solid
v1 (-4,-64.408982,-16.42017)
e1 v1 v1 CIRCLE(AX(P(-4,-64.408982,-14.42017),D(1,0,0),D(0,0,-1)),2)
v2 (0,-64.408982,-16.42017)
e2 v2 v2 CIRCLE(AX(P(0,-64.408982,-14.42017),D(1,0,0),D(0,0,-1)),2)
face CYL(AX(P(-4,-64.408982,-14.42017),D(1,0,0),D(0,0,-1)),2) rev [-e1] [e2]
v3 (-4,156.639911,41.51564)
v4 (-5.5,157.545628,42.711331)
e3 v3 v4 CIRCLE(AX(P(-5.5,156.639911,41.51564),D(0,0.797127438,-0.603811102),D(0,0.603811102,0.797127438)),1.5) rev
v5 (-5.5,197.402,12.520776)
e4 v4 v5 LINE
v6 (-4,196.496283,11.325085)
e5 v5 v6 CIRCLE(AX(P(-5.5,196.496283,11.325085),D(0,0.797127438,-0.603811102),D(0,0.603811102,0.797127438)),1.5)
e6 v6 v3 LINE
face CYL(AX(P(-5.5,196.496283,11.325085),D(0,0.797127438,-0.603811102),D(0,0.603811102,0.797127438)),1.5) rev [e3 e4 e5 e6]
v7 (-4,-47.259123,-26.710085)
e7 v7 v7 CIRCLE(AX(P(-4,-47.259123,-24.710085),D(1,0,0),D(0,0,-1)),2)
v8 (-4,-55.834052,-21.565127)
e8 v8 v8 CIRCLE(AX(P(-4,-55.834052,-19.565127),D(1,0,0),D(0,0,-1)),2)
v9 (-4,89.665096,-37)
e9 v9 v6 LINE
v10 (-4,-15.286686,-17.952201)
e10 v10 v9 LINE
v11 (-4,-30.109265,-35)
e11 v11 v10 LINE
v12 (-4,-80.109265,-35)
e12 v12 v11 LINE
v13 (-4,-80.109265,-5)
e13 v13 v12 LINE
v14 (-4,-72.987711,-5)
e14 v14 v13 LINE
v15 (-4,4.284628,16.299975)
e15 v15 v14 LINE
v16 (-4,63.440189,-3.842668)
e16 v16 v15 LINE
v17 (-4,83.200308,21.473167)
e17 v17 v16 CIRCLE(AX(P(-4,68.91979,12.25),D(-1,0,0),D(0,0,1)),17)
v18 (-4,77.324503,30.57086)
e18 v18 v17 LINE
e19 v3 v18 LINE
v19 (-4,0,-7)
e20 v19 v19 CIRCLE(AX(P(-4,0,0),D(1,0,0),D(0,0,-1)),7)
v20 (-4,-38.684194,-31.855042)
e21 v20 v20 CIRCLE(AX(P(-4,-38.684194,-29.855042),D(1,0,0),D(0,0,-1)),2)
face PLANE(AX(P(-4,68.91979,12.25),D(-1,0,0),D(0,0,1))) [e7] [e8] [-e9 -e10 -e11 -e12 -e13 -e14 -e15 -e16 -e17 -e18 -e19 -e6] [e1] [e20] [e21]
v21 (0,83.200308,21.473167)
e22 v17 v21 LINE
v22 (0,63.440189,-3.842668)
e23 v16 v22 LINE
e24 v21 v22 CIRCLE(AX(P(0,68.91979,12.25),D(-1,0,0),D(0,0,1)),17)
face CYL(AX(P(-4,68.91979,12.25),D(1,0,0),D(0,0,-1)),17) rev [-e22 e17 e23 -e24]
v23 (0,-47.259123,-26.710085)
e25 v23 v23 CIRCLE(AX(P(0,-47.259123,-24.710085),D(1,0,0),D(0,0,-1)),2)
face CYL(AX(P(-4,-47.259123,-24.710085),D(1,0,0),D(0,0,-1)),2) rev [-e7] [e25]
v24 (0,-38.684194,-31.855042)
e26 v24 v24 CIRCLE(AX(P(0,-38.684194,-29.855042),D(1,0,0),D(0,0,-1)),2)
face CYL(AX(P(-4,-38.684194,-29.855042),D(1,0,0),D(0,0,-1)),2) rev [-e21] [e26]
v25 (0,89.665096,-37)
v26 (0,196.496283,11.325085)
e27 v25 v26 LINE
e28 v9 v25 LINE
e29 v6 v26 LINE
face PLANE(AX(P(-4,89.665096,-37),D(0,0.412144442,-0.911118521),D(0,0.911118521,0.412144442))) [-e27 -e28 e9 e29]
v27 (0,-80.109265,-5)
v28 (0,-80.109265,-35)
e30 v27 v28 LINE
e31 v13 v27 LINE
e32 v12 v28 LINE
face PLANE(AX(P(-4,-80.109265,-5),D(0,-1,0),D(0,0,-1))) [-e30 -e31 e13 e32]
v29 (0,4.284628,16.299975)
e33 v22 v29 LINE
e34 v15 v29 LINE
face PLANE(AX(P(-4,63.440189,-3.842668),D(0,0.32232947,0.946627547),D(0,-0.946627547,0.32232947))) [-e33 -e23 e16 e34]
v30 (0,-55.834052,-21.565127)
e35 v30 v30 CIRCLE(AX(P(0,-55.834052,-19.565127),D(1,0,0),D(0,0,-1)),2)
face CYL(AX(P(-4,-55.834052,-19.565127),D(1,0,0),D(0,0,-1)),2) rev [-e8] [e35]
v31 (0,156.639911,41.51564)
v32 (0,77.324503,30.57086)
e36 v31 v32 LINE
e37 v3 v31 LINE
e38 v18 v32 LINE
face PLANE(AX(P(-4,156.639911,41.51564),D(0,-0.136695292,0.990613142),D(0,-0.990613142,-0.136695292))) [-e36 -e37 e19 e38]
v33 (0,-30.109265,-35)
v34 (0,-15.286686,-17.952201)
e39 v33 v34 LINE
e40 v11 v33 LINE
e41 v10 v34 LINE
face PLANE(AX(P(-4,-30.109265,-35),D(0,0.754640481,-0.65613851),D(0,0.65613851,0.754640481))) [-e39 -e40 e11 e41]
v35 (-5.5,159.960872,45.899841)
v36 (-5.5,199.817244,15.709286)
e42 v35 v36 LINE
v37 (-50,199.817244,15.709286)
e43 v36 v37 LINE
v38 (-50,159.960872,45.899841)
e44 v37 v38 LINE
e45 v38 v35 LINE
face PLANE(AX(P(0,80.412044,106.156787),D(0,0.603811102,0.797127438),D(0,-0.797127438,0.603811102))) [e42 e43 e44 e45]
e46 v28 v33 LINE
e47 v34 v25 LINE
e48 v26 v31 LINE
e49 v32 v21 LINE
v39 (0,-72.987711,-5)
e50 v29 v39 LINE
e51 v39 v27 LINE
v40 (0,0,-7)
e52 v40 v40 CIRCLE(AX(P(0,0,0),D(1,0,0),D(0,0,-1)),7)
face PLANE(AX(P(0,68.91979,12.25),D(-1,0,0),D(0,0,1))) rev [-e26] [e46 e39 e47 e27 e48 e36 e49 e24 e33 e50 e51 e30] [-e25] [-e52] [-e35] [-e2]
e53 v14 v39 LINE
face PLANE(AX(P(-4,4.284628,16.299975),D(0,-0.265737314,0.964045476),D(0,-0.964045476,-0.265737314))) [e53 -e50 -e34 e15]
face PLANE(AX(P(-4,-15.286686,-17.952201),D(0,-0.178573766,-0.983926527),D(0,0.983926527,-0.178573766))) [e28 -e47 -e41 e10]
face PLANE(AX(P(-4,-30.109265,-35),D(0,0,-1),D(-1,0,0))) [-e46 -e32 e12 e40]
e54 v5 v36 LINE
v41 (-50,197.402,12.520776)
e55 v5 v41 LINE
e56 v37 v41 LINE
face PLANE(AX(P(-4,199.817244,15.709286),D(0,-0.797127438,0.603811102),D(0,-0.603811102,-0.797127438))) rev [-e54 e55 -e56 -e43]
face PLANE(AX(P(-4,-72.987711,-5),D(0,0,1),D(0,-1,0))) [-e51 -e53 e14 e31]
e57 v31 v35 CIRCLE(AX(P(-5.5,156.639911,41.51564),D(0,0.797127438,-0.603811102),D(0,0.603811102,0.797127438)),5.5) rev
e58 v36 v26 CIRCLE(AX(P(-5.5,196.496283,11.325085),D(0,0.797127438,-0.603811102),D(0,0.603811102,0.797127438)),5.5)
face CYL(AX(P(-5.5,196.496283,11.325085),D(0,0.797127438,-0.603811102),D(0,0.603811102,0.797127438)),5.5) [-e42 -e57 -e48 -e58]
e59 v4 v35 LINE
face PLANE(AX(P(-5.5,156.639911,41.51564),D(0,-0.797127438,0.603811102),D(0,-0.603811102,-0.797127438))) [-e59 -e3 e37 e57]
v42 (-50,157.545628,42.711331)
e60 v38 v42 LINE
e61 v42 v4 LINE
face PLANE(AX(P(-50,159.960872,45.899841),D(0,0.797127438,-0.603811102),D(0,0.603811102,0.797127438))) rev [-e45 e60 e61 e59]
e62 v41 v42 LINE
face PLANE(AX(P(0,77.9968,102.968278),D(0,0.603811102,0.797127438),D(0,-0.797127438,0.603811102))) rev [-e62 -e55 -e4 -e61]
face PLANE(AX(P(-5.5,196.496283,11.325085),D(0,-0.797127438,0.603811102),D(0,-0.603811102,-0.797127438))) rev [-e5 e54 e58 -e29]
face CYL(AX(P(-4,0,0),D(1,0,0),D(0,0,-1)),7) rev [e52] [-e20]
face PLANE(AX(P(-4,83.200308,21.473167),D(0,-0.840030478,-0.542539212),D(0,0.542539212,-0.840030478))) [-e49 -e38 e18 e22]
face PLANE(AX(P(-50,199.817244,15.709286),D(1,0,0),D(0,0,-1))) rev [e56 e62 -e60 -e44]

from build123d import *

# Parameters (mm, degrees)
SKETCH_6_R             = 7
SKETCH_6_R_2           = 2
SM_BASE_FLANGE_2_DEPTH = 4
SM_EDGE_FLANGE_1_DEPTH = 50


# Sheet-metal steps are written as plain solids
with BuildPart() as part:
    # Эскиз6 → Базовая кромка2 (new body)
    with BuildSketch(Plane(origin=(0, 0, 0), x_dir=(0, 0, -1), z_dir=(1, 0, 0))):
        with BuildLine():
            Line((-41.515639953, 156.639911011), (-30.570860008, 77.324503301))
            Line((-30.570860008, 77.324503301), (-21.473166605, 83.200308456))
            ThreePointArc((-21.473166605, 83.200308456), (-1.78992877, 82.320794398), (3.842668301, 63.440189352))
            Line((3.842668301, 63.440189352), (-16.29997452, 4.284628471))
            Line((-16.29997452, 4.284628471), (5, -72.987711453))
            Line((5, -72.987711453), (5, -80.109264525))
            Line((5, -80.109264525), (35, -80.109264525))
            Line((35, -80.109264525), (35, -30.109264525))
            Line((35, -30.109264525), (17.952200663, -15.286686185))
            Line((17.952200663, -15.286686185), (37, 89.665096307))
            Line((37, 89.665096307), (-11.325084854, 196.496282933))
            Line((-11.325084854, 196.496282933), (-41.515639953, 156.639911011))
        make_face()
        Circle(SKETCH_6_R, mode=Mode.SUBTRACT)
        with Locations((29.855042446, -38.684193782)):
            Circle(SKETCH_6_R_2, mode=Mode.SUBTRACT)
        with Locations((24.710084891, -47.259123039)):
            Circle(SKETCH_6_R_2, mode=Mode.SUBTRACT)
        with Locations((19.565127337, -55.834052297)):
            Circle(SKETCH_6_R_2, mode=Mode.SUBTRACT)
        with Locations((14.420169783, -64.408981554)):
            Circle(SKETCH_6_R_2, mode=Mode.SUBTRACT)
    extrude(amount=-SM_BASE_FLANGE_2_DEPTH)

    # Ребро-кромка1 section (across the edge) → Ребро-кромка1 (add)
    with BuildSketch(Plane(origin=(-4, 157.545627664, 42.711331111), x_dir=(-3.4914813388431334e-15, -0.6038111019965894, -0.7971274384348241), z_dir=(0, 0.7971274384348241, -0.6038111019965894))):
        with BuildLine():
            Line((-4, 1.5), (-4, 46))
            Line((-4, 46), (0, 46))
            Line((0, 46), (0, 1.5))
            ThreePointArc((0, 1.5), (0.439339828, 0.439339828), (1.5, 0))
            Line((1.5, 0), (1.5, -4))
            ThreePointArc((1.5, -4), (-2.389087297, -2.389087297), (-4, 1.5))
        make_face()
    extrude(amount=SM_EDGE_FLANGE_1_DEPTH)


solid = part.part
